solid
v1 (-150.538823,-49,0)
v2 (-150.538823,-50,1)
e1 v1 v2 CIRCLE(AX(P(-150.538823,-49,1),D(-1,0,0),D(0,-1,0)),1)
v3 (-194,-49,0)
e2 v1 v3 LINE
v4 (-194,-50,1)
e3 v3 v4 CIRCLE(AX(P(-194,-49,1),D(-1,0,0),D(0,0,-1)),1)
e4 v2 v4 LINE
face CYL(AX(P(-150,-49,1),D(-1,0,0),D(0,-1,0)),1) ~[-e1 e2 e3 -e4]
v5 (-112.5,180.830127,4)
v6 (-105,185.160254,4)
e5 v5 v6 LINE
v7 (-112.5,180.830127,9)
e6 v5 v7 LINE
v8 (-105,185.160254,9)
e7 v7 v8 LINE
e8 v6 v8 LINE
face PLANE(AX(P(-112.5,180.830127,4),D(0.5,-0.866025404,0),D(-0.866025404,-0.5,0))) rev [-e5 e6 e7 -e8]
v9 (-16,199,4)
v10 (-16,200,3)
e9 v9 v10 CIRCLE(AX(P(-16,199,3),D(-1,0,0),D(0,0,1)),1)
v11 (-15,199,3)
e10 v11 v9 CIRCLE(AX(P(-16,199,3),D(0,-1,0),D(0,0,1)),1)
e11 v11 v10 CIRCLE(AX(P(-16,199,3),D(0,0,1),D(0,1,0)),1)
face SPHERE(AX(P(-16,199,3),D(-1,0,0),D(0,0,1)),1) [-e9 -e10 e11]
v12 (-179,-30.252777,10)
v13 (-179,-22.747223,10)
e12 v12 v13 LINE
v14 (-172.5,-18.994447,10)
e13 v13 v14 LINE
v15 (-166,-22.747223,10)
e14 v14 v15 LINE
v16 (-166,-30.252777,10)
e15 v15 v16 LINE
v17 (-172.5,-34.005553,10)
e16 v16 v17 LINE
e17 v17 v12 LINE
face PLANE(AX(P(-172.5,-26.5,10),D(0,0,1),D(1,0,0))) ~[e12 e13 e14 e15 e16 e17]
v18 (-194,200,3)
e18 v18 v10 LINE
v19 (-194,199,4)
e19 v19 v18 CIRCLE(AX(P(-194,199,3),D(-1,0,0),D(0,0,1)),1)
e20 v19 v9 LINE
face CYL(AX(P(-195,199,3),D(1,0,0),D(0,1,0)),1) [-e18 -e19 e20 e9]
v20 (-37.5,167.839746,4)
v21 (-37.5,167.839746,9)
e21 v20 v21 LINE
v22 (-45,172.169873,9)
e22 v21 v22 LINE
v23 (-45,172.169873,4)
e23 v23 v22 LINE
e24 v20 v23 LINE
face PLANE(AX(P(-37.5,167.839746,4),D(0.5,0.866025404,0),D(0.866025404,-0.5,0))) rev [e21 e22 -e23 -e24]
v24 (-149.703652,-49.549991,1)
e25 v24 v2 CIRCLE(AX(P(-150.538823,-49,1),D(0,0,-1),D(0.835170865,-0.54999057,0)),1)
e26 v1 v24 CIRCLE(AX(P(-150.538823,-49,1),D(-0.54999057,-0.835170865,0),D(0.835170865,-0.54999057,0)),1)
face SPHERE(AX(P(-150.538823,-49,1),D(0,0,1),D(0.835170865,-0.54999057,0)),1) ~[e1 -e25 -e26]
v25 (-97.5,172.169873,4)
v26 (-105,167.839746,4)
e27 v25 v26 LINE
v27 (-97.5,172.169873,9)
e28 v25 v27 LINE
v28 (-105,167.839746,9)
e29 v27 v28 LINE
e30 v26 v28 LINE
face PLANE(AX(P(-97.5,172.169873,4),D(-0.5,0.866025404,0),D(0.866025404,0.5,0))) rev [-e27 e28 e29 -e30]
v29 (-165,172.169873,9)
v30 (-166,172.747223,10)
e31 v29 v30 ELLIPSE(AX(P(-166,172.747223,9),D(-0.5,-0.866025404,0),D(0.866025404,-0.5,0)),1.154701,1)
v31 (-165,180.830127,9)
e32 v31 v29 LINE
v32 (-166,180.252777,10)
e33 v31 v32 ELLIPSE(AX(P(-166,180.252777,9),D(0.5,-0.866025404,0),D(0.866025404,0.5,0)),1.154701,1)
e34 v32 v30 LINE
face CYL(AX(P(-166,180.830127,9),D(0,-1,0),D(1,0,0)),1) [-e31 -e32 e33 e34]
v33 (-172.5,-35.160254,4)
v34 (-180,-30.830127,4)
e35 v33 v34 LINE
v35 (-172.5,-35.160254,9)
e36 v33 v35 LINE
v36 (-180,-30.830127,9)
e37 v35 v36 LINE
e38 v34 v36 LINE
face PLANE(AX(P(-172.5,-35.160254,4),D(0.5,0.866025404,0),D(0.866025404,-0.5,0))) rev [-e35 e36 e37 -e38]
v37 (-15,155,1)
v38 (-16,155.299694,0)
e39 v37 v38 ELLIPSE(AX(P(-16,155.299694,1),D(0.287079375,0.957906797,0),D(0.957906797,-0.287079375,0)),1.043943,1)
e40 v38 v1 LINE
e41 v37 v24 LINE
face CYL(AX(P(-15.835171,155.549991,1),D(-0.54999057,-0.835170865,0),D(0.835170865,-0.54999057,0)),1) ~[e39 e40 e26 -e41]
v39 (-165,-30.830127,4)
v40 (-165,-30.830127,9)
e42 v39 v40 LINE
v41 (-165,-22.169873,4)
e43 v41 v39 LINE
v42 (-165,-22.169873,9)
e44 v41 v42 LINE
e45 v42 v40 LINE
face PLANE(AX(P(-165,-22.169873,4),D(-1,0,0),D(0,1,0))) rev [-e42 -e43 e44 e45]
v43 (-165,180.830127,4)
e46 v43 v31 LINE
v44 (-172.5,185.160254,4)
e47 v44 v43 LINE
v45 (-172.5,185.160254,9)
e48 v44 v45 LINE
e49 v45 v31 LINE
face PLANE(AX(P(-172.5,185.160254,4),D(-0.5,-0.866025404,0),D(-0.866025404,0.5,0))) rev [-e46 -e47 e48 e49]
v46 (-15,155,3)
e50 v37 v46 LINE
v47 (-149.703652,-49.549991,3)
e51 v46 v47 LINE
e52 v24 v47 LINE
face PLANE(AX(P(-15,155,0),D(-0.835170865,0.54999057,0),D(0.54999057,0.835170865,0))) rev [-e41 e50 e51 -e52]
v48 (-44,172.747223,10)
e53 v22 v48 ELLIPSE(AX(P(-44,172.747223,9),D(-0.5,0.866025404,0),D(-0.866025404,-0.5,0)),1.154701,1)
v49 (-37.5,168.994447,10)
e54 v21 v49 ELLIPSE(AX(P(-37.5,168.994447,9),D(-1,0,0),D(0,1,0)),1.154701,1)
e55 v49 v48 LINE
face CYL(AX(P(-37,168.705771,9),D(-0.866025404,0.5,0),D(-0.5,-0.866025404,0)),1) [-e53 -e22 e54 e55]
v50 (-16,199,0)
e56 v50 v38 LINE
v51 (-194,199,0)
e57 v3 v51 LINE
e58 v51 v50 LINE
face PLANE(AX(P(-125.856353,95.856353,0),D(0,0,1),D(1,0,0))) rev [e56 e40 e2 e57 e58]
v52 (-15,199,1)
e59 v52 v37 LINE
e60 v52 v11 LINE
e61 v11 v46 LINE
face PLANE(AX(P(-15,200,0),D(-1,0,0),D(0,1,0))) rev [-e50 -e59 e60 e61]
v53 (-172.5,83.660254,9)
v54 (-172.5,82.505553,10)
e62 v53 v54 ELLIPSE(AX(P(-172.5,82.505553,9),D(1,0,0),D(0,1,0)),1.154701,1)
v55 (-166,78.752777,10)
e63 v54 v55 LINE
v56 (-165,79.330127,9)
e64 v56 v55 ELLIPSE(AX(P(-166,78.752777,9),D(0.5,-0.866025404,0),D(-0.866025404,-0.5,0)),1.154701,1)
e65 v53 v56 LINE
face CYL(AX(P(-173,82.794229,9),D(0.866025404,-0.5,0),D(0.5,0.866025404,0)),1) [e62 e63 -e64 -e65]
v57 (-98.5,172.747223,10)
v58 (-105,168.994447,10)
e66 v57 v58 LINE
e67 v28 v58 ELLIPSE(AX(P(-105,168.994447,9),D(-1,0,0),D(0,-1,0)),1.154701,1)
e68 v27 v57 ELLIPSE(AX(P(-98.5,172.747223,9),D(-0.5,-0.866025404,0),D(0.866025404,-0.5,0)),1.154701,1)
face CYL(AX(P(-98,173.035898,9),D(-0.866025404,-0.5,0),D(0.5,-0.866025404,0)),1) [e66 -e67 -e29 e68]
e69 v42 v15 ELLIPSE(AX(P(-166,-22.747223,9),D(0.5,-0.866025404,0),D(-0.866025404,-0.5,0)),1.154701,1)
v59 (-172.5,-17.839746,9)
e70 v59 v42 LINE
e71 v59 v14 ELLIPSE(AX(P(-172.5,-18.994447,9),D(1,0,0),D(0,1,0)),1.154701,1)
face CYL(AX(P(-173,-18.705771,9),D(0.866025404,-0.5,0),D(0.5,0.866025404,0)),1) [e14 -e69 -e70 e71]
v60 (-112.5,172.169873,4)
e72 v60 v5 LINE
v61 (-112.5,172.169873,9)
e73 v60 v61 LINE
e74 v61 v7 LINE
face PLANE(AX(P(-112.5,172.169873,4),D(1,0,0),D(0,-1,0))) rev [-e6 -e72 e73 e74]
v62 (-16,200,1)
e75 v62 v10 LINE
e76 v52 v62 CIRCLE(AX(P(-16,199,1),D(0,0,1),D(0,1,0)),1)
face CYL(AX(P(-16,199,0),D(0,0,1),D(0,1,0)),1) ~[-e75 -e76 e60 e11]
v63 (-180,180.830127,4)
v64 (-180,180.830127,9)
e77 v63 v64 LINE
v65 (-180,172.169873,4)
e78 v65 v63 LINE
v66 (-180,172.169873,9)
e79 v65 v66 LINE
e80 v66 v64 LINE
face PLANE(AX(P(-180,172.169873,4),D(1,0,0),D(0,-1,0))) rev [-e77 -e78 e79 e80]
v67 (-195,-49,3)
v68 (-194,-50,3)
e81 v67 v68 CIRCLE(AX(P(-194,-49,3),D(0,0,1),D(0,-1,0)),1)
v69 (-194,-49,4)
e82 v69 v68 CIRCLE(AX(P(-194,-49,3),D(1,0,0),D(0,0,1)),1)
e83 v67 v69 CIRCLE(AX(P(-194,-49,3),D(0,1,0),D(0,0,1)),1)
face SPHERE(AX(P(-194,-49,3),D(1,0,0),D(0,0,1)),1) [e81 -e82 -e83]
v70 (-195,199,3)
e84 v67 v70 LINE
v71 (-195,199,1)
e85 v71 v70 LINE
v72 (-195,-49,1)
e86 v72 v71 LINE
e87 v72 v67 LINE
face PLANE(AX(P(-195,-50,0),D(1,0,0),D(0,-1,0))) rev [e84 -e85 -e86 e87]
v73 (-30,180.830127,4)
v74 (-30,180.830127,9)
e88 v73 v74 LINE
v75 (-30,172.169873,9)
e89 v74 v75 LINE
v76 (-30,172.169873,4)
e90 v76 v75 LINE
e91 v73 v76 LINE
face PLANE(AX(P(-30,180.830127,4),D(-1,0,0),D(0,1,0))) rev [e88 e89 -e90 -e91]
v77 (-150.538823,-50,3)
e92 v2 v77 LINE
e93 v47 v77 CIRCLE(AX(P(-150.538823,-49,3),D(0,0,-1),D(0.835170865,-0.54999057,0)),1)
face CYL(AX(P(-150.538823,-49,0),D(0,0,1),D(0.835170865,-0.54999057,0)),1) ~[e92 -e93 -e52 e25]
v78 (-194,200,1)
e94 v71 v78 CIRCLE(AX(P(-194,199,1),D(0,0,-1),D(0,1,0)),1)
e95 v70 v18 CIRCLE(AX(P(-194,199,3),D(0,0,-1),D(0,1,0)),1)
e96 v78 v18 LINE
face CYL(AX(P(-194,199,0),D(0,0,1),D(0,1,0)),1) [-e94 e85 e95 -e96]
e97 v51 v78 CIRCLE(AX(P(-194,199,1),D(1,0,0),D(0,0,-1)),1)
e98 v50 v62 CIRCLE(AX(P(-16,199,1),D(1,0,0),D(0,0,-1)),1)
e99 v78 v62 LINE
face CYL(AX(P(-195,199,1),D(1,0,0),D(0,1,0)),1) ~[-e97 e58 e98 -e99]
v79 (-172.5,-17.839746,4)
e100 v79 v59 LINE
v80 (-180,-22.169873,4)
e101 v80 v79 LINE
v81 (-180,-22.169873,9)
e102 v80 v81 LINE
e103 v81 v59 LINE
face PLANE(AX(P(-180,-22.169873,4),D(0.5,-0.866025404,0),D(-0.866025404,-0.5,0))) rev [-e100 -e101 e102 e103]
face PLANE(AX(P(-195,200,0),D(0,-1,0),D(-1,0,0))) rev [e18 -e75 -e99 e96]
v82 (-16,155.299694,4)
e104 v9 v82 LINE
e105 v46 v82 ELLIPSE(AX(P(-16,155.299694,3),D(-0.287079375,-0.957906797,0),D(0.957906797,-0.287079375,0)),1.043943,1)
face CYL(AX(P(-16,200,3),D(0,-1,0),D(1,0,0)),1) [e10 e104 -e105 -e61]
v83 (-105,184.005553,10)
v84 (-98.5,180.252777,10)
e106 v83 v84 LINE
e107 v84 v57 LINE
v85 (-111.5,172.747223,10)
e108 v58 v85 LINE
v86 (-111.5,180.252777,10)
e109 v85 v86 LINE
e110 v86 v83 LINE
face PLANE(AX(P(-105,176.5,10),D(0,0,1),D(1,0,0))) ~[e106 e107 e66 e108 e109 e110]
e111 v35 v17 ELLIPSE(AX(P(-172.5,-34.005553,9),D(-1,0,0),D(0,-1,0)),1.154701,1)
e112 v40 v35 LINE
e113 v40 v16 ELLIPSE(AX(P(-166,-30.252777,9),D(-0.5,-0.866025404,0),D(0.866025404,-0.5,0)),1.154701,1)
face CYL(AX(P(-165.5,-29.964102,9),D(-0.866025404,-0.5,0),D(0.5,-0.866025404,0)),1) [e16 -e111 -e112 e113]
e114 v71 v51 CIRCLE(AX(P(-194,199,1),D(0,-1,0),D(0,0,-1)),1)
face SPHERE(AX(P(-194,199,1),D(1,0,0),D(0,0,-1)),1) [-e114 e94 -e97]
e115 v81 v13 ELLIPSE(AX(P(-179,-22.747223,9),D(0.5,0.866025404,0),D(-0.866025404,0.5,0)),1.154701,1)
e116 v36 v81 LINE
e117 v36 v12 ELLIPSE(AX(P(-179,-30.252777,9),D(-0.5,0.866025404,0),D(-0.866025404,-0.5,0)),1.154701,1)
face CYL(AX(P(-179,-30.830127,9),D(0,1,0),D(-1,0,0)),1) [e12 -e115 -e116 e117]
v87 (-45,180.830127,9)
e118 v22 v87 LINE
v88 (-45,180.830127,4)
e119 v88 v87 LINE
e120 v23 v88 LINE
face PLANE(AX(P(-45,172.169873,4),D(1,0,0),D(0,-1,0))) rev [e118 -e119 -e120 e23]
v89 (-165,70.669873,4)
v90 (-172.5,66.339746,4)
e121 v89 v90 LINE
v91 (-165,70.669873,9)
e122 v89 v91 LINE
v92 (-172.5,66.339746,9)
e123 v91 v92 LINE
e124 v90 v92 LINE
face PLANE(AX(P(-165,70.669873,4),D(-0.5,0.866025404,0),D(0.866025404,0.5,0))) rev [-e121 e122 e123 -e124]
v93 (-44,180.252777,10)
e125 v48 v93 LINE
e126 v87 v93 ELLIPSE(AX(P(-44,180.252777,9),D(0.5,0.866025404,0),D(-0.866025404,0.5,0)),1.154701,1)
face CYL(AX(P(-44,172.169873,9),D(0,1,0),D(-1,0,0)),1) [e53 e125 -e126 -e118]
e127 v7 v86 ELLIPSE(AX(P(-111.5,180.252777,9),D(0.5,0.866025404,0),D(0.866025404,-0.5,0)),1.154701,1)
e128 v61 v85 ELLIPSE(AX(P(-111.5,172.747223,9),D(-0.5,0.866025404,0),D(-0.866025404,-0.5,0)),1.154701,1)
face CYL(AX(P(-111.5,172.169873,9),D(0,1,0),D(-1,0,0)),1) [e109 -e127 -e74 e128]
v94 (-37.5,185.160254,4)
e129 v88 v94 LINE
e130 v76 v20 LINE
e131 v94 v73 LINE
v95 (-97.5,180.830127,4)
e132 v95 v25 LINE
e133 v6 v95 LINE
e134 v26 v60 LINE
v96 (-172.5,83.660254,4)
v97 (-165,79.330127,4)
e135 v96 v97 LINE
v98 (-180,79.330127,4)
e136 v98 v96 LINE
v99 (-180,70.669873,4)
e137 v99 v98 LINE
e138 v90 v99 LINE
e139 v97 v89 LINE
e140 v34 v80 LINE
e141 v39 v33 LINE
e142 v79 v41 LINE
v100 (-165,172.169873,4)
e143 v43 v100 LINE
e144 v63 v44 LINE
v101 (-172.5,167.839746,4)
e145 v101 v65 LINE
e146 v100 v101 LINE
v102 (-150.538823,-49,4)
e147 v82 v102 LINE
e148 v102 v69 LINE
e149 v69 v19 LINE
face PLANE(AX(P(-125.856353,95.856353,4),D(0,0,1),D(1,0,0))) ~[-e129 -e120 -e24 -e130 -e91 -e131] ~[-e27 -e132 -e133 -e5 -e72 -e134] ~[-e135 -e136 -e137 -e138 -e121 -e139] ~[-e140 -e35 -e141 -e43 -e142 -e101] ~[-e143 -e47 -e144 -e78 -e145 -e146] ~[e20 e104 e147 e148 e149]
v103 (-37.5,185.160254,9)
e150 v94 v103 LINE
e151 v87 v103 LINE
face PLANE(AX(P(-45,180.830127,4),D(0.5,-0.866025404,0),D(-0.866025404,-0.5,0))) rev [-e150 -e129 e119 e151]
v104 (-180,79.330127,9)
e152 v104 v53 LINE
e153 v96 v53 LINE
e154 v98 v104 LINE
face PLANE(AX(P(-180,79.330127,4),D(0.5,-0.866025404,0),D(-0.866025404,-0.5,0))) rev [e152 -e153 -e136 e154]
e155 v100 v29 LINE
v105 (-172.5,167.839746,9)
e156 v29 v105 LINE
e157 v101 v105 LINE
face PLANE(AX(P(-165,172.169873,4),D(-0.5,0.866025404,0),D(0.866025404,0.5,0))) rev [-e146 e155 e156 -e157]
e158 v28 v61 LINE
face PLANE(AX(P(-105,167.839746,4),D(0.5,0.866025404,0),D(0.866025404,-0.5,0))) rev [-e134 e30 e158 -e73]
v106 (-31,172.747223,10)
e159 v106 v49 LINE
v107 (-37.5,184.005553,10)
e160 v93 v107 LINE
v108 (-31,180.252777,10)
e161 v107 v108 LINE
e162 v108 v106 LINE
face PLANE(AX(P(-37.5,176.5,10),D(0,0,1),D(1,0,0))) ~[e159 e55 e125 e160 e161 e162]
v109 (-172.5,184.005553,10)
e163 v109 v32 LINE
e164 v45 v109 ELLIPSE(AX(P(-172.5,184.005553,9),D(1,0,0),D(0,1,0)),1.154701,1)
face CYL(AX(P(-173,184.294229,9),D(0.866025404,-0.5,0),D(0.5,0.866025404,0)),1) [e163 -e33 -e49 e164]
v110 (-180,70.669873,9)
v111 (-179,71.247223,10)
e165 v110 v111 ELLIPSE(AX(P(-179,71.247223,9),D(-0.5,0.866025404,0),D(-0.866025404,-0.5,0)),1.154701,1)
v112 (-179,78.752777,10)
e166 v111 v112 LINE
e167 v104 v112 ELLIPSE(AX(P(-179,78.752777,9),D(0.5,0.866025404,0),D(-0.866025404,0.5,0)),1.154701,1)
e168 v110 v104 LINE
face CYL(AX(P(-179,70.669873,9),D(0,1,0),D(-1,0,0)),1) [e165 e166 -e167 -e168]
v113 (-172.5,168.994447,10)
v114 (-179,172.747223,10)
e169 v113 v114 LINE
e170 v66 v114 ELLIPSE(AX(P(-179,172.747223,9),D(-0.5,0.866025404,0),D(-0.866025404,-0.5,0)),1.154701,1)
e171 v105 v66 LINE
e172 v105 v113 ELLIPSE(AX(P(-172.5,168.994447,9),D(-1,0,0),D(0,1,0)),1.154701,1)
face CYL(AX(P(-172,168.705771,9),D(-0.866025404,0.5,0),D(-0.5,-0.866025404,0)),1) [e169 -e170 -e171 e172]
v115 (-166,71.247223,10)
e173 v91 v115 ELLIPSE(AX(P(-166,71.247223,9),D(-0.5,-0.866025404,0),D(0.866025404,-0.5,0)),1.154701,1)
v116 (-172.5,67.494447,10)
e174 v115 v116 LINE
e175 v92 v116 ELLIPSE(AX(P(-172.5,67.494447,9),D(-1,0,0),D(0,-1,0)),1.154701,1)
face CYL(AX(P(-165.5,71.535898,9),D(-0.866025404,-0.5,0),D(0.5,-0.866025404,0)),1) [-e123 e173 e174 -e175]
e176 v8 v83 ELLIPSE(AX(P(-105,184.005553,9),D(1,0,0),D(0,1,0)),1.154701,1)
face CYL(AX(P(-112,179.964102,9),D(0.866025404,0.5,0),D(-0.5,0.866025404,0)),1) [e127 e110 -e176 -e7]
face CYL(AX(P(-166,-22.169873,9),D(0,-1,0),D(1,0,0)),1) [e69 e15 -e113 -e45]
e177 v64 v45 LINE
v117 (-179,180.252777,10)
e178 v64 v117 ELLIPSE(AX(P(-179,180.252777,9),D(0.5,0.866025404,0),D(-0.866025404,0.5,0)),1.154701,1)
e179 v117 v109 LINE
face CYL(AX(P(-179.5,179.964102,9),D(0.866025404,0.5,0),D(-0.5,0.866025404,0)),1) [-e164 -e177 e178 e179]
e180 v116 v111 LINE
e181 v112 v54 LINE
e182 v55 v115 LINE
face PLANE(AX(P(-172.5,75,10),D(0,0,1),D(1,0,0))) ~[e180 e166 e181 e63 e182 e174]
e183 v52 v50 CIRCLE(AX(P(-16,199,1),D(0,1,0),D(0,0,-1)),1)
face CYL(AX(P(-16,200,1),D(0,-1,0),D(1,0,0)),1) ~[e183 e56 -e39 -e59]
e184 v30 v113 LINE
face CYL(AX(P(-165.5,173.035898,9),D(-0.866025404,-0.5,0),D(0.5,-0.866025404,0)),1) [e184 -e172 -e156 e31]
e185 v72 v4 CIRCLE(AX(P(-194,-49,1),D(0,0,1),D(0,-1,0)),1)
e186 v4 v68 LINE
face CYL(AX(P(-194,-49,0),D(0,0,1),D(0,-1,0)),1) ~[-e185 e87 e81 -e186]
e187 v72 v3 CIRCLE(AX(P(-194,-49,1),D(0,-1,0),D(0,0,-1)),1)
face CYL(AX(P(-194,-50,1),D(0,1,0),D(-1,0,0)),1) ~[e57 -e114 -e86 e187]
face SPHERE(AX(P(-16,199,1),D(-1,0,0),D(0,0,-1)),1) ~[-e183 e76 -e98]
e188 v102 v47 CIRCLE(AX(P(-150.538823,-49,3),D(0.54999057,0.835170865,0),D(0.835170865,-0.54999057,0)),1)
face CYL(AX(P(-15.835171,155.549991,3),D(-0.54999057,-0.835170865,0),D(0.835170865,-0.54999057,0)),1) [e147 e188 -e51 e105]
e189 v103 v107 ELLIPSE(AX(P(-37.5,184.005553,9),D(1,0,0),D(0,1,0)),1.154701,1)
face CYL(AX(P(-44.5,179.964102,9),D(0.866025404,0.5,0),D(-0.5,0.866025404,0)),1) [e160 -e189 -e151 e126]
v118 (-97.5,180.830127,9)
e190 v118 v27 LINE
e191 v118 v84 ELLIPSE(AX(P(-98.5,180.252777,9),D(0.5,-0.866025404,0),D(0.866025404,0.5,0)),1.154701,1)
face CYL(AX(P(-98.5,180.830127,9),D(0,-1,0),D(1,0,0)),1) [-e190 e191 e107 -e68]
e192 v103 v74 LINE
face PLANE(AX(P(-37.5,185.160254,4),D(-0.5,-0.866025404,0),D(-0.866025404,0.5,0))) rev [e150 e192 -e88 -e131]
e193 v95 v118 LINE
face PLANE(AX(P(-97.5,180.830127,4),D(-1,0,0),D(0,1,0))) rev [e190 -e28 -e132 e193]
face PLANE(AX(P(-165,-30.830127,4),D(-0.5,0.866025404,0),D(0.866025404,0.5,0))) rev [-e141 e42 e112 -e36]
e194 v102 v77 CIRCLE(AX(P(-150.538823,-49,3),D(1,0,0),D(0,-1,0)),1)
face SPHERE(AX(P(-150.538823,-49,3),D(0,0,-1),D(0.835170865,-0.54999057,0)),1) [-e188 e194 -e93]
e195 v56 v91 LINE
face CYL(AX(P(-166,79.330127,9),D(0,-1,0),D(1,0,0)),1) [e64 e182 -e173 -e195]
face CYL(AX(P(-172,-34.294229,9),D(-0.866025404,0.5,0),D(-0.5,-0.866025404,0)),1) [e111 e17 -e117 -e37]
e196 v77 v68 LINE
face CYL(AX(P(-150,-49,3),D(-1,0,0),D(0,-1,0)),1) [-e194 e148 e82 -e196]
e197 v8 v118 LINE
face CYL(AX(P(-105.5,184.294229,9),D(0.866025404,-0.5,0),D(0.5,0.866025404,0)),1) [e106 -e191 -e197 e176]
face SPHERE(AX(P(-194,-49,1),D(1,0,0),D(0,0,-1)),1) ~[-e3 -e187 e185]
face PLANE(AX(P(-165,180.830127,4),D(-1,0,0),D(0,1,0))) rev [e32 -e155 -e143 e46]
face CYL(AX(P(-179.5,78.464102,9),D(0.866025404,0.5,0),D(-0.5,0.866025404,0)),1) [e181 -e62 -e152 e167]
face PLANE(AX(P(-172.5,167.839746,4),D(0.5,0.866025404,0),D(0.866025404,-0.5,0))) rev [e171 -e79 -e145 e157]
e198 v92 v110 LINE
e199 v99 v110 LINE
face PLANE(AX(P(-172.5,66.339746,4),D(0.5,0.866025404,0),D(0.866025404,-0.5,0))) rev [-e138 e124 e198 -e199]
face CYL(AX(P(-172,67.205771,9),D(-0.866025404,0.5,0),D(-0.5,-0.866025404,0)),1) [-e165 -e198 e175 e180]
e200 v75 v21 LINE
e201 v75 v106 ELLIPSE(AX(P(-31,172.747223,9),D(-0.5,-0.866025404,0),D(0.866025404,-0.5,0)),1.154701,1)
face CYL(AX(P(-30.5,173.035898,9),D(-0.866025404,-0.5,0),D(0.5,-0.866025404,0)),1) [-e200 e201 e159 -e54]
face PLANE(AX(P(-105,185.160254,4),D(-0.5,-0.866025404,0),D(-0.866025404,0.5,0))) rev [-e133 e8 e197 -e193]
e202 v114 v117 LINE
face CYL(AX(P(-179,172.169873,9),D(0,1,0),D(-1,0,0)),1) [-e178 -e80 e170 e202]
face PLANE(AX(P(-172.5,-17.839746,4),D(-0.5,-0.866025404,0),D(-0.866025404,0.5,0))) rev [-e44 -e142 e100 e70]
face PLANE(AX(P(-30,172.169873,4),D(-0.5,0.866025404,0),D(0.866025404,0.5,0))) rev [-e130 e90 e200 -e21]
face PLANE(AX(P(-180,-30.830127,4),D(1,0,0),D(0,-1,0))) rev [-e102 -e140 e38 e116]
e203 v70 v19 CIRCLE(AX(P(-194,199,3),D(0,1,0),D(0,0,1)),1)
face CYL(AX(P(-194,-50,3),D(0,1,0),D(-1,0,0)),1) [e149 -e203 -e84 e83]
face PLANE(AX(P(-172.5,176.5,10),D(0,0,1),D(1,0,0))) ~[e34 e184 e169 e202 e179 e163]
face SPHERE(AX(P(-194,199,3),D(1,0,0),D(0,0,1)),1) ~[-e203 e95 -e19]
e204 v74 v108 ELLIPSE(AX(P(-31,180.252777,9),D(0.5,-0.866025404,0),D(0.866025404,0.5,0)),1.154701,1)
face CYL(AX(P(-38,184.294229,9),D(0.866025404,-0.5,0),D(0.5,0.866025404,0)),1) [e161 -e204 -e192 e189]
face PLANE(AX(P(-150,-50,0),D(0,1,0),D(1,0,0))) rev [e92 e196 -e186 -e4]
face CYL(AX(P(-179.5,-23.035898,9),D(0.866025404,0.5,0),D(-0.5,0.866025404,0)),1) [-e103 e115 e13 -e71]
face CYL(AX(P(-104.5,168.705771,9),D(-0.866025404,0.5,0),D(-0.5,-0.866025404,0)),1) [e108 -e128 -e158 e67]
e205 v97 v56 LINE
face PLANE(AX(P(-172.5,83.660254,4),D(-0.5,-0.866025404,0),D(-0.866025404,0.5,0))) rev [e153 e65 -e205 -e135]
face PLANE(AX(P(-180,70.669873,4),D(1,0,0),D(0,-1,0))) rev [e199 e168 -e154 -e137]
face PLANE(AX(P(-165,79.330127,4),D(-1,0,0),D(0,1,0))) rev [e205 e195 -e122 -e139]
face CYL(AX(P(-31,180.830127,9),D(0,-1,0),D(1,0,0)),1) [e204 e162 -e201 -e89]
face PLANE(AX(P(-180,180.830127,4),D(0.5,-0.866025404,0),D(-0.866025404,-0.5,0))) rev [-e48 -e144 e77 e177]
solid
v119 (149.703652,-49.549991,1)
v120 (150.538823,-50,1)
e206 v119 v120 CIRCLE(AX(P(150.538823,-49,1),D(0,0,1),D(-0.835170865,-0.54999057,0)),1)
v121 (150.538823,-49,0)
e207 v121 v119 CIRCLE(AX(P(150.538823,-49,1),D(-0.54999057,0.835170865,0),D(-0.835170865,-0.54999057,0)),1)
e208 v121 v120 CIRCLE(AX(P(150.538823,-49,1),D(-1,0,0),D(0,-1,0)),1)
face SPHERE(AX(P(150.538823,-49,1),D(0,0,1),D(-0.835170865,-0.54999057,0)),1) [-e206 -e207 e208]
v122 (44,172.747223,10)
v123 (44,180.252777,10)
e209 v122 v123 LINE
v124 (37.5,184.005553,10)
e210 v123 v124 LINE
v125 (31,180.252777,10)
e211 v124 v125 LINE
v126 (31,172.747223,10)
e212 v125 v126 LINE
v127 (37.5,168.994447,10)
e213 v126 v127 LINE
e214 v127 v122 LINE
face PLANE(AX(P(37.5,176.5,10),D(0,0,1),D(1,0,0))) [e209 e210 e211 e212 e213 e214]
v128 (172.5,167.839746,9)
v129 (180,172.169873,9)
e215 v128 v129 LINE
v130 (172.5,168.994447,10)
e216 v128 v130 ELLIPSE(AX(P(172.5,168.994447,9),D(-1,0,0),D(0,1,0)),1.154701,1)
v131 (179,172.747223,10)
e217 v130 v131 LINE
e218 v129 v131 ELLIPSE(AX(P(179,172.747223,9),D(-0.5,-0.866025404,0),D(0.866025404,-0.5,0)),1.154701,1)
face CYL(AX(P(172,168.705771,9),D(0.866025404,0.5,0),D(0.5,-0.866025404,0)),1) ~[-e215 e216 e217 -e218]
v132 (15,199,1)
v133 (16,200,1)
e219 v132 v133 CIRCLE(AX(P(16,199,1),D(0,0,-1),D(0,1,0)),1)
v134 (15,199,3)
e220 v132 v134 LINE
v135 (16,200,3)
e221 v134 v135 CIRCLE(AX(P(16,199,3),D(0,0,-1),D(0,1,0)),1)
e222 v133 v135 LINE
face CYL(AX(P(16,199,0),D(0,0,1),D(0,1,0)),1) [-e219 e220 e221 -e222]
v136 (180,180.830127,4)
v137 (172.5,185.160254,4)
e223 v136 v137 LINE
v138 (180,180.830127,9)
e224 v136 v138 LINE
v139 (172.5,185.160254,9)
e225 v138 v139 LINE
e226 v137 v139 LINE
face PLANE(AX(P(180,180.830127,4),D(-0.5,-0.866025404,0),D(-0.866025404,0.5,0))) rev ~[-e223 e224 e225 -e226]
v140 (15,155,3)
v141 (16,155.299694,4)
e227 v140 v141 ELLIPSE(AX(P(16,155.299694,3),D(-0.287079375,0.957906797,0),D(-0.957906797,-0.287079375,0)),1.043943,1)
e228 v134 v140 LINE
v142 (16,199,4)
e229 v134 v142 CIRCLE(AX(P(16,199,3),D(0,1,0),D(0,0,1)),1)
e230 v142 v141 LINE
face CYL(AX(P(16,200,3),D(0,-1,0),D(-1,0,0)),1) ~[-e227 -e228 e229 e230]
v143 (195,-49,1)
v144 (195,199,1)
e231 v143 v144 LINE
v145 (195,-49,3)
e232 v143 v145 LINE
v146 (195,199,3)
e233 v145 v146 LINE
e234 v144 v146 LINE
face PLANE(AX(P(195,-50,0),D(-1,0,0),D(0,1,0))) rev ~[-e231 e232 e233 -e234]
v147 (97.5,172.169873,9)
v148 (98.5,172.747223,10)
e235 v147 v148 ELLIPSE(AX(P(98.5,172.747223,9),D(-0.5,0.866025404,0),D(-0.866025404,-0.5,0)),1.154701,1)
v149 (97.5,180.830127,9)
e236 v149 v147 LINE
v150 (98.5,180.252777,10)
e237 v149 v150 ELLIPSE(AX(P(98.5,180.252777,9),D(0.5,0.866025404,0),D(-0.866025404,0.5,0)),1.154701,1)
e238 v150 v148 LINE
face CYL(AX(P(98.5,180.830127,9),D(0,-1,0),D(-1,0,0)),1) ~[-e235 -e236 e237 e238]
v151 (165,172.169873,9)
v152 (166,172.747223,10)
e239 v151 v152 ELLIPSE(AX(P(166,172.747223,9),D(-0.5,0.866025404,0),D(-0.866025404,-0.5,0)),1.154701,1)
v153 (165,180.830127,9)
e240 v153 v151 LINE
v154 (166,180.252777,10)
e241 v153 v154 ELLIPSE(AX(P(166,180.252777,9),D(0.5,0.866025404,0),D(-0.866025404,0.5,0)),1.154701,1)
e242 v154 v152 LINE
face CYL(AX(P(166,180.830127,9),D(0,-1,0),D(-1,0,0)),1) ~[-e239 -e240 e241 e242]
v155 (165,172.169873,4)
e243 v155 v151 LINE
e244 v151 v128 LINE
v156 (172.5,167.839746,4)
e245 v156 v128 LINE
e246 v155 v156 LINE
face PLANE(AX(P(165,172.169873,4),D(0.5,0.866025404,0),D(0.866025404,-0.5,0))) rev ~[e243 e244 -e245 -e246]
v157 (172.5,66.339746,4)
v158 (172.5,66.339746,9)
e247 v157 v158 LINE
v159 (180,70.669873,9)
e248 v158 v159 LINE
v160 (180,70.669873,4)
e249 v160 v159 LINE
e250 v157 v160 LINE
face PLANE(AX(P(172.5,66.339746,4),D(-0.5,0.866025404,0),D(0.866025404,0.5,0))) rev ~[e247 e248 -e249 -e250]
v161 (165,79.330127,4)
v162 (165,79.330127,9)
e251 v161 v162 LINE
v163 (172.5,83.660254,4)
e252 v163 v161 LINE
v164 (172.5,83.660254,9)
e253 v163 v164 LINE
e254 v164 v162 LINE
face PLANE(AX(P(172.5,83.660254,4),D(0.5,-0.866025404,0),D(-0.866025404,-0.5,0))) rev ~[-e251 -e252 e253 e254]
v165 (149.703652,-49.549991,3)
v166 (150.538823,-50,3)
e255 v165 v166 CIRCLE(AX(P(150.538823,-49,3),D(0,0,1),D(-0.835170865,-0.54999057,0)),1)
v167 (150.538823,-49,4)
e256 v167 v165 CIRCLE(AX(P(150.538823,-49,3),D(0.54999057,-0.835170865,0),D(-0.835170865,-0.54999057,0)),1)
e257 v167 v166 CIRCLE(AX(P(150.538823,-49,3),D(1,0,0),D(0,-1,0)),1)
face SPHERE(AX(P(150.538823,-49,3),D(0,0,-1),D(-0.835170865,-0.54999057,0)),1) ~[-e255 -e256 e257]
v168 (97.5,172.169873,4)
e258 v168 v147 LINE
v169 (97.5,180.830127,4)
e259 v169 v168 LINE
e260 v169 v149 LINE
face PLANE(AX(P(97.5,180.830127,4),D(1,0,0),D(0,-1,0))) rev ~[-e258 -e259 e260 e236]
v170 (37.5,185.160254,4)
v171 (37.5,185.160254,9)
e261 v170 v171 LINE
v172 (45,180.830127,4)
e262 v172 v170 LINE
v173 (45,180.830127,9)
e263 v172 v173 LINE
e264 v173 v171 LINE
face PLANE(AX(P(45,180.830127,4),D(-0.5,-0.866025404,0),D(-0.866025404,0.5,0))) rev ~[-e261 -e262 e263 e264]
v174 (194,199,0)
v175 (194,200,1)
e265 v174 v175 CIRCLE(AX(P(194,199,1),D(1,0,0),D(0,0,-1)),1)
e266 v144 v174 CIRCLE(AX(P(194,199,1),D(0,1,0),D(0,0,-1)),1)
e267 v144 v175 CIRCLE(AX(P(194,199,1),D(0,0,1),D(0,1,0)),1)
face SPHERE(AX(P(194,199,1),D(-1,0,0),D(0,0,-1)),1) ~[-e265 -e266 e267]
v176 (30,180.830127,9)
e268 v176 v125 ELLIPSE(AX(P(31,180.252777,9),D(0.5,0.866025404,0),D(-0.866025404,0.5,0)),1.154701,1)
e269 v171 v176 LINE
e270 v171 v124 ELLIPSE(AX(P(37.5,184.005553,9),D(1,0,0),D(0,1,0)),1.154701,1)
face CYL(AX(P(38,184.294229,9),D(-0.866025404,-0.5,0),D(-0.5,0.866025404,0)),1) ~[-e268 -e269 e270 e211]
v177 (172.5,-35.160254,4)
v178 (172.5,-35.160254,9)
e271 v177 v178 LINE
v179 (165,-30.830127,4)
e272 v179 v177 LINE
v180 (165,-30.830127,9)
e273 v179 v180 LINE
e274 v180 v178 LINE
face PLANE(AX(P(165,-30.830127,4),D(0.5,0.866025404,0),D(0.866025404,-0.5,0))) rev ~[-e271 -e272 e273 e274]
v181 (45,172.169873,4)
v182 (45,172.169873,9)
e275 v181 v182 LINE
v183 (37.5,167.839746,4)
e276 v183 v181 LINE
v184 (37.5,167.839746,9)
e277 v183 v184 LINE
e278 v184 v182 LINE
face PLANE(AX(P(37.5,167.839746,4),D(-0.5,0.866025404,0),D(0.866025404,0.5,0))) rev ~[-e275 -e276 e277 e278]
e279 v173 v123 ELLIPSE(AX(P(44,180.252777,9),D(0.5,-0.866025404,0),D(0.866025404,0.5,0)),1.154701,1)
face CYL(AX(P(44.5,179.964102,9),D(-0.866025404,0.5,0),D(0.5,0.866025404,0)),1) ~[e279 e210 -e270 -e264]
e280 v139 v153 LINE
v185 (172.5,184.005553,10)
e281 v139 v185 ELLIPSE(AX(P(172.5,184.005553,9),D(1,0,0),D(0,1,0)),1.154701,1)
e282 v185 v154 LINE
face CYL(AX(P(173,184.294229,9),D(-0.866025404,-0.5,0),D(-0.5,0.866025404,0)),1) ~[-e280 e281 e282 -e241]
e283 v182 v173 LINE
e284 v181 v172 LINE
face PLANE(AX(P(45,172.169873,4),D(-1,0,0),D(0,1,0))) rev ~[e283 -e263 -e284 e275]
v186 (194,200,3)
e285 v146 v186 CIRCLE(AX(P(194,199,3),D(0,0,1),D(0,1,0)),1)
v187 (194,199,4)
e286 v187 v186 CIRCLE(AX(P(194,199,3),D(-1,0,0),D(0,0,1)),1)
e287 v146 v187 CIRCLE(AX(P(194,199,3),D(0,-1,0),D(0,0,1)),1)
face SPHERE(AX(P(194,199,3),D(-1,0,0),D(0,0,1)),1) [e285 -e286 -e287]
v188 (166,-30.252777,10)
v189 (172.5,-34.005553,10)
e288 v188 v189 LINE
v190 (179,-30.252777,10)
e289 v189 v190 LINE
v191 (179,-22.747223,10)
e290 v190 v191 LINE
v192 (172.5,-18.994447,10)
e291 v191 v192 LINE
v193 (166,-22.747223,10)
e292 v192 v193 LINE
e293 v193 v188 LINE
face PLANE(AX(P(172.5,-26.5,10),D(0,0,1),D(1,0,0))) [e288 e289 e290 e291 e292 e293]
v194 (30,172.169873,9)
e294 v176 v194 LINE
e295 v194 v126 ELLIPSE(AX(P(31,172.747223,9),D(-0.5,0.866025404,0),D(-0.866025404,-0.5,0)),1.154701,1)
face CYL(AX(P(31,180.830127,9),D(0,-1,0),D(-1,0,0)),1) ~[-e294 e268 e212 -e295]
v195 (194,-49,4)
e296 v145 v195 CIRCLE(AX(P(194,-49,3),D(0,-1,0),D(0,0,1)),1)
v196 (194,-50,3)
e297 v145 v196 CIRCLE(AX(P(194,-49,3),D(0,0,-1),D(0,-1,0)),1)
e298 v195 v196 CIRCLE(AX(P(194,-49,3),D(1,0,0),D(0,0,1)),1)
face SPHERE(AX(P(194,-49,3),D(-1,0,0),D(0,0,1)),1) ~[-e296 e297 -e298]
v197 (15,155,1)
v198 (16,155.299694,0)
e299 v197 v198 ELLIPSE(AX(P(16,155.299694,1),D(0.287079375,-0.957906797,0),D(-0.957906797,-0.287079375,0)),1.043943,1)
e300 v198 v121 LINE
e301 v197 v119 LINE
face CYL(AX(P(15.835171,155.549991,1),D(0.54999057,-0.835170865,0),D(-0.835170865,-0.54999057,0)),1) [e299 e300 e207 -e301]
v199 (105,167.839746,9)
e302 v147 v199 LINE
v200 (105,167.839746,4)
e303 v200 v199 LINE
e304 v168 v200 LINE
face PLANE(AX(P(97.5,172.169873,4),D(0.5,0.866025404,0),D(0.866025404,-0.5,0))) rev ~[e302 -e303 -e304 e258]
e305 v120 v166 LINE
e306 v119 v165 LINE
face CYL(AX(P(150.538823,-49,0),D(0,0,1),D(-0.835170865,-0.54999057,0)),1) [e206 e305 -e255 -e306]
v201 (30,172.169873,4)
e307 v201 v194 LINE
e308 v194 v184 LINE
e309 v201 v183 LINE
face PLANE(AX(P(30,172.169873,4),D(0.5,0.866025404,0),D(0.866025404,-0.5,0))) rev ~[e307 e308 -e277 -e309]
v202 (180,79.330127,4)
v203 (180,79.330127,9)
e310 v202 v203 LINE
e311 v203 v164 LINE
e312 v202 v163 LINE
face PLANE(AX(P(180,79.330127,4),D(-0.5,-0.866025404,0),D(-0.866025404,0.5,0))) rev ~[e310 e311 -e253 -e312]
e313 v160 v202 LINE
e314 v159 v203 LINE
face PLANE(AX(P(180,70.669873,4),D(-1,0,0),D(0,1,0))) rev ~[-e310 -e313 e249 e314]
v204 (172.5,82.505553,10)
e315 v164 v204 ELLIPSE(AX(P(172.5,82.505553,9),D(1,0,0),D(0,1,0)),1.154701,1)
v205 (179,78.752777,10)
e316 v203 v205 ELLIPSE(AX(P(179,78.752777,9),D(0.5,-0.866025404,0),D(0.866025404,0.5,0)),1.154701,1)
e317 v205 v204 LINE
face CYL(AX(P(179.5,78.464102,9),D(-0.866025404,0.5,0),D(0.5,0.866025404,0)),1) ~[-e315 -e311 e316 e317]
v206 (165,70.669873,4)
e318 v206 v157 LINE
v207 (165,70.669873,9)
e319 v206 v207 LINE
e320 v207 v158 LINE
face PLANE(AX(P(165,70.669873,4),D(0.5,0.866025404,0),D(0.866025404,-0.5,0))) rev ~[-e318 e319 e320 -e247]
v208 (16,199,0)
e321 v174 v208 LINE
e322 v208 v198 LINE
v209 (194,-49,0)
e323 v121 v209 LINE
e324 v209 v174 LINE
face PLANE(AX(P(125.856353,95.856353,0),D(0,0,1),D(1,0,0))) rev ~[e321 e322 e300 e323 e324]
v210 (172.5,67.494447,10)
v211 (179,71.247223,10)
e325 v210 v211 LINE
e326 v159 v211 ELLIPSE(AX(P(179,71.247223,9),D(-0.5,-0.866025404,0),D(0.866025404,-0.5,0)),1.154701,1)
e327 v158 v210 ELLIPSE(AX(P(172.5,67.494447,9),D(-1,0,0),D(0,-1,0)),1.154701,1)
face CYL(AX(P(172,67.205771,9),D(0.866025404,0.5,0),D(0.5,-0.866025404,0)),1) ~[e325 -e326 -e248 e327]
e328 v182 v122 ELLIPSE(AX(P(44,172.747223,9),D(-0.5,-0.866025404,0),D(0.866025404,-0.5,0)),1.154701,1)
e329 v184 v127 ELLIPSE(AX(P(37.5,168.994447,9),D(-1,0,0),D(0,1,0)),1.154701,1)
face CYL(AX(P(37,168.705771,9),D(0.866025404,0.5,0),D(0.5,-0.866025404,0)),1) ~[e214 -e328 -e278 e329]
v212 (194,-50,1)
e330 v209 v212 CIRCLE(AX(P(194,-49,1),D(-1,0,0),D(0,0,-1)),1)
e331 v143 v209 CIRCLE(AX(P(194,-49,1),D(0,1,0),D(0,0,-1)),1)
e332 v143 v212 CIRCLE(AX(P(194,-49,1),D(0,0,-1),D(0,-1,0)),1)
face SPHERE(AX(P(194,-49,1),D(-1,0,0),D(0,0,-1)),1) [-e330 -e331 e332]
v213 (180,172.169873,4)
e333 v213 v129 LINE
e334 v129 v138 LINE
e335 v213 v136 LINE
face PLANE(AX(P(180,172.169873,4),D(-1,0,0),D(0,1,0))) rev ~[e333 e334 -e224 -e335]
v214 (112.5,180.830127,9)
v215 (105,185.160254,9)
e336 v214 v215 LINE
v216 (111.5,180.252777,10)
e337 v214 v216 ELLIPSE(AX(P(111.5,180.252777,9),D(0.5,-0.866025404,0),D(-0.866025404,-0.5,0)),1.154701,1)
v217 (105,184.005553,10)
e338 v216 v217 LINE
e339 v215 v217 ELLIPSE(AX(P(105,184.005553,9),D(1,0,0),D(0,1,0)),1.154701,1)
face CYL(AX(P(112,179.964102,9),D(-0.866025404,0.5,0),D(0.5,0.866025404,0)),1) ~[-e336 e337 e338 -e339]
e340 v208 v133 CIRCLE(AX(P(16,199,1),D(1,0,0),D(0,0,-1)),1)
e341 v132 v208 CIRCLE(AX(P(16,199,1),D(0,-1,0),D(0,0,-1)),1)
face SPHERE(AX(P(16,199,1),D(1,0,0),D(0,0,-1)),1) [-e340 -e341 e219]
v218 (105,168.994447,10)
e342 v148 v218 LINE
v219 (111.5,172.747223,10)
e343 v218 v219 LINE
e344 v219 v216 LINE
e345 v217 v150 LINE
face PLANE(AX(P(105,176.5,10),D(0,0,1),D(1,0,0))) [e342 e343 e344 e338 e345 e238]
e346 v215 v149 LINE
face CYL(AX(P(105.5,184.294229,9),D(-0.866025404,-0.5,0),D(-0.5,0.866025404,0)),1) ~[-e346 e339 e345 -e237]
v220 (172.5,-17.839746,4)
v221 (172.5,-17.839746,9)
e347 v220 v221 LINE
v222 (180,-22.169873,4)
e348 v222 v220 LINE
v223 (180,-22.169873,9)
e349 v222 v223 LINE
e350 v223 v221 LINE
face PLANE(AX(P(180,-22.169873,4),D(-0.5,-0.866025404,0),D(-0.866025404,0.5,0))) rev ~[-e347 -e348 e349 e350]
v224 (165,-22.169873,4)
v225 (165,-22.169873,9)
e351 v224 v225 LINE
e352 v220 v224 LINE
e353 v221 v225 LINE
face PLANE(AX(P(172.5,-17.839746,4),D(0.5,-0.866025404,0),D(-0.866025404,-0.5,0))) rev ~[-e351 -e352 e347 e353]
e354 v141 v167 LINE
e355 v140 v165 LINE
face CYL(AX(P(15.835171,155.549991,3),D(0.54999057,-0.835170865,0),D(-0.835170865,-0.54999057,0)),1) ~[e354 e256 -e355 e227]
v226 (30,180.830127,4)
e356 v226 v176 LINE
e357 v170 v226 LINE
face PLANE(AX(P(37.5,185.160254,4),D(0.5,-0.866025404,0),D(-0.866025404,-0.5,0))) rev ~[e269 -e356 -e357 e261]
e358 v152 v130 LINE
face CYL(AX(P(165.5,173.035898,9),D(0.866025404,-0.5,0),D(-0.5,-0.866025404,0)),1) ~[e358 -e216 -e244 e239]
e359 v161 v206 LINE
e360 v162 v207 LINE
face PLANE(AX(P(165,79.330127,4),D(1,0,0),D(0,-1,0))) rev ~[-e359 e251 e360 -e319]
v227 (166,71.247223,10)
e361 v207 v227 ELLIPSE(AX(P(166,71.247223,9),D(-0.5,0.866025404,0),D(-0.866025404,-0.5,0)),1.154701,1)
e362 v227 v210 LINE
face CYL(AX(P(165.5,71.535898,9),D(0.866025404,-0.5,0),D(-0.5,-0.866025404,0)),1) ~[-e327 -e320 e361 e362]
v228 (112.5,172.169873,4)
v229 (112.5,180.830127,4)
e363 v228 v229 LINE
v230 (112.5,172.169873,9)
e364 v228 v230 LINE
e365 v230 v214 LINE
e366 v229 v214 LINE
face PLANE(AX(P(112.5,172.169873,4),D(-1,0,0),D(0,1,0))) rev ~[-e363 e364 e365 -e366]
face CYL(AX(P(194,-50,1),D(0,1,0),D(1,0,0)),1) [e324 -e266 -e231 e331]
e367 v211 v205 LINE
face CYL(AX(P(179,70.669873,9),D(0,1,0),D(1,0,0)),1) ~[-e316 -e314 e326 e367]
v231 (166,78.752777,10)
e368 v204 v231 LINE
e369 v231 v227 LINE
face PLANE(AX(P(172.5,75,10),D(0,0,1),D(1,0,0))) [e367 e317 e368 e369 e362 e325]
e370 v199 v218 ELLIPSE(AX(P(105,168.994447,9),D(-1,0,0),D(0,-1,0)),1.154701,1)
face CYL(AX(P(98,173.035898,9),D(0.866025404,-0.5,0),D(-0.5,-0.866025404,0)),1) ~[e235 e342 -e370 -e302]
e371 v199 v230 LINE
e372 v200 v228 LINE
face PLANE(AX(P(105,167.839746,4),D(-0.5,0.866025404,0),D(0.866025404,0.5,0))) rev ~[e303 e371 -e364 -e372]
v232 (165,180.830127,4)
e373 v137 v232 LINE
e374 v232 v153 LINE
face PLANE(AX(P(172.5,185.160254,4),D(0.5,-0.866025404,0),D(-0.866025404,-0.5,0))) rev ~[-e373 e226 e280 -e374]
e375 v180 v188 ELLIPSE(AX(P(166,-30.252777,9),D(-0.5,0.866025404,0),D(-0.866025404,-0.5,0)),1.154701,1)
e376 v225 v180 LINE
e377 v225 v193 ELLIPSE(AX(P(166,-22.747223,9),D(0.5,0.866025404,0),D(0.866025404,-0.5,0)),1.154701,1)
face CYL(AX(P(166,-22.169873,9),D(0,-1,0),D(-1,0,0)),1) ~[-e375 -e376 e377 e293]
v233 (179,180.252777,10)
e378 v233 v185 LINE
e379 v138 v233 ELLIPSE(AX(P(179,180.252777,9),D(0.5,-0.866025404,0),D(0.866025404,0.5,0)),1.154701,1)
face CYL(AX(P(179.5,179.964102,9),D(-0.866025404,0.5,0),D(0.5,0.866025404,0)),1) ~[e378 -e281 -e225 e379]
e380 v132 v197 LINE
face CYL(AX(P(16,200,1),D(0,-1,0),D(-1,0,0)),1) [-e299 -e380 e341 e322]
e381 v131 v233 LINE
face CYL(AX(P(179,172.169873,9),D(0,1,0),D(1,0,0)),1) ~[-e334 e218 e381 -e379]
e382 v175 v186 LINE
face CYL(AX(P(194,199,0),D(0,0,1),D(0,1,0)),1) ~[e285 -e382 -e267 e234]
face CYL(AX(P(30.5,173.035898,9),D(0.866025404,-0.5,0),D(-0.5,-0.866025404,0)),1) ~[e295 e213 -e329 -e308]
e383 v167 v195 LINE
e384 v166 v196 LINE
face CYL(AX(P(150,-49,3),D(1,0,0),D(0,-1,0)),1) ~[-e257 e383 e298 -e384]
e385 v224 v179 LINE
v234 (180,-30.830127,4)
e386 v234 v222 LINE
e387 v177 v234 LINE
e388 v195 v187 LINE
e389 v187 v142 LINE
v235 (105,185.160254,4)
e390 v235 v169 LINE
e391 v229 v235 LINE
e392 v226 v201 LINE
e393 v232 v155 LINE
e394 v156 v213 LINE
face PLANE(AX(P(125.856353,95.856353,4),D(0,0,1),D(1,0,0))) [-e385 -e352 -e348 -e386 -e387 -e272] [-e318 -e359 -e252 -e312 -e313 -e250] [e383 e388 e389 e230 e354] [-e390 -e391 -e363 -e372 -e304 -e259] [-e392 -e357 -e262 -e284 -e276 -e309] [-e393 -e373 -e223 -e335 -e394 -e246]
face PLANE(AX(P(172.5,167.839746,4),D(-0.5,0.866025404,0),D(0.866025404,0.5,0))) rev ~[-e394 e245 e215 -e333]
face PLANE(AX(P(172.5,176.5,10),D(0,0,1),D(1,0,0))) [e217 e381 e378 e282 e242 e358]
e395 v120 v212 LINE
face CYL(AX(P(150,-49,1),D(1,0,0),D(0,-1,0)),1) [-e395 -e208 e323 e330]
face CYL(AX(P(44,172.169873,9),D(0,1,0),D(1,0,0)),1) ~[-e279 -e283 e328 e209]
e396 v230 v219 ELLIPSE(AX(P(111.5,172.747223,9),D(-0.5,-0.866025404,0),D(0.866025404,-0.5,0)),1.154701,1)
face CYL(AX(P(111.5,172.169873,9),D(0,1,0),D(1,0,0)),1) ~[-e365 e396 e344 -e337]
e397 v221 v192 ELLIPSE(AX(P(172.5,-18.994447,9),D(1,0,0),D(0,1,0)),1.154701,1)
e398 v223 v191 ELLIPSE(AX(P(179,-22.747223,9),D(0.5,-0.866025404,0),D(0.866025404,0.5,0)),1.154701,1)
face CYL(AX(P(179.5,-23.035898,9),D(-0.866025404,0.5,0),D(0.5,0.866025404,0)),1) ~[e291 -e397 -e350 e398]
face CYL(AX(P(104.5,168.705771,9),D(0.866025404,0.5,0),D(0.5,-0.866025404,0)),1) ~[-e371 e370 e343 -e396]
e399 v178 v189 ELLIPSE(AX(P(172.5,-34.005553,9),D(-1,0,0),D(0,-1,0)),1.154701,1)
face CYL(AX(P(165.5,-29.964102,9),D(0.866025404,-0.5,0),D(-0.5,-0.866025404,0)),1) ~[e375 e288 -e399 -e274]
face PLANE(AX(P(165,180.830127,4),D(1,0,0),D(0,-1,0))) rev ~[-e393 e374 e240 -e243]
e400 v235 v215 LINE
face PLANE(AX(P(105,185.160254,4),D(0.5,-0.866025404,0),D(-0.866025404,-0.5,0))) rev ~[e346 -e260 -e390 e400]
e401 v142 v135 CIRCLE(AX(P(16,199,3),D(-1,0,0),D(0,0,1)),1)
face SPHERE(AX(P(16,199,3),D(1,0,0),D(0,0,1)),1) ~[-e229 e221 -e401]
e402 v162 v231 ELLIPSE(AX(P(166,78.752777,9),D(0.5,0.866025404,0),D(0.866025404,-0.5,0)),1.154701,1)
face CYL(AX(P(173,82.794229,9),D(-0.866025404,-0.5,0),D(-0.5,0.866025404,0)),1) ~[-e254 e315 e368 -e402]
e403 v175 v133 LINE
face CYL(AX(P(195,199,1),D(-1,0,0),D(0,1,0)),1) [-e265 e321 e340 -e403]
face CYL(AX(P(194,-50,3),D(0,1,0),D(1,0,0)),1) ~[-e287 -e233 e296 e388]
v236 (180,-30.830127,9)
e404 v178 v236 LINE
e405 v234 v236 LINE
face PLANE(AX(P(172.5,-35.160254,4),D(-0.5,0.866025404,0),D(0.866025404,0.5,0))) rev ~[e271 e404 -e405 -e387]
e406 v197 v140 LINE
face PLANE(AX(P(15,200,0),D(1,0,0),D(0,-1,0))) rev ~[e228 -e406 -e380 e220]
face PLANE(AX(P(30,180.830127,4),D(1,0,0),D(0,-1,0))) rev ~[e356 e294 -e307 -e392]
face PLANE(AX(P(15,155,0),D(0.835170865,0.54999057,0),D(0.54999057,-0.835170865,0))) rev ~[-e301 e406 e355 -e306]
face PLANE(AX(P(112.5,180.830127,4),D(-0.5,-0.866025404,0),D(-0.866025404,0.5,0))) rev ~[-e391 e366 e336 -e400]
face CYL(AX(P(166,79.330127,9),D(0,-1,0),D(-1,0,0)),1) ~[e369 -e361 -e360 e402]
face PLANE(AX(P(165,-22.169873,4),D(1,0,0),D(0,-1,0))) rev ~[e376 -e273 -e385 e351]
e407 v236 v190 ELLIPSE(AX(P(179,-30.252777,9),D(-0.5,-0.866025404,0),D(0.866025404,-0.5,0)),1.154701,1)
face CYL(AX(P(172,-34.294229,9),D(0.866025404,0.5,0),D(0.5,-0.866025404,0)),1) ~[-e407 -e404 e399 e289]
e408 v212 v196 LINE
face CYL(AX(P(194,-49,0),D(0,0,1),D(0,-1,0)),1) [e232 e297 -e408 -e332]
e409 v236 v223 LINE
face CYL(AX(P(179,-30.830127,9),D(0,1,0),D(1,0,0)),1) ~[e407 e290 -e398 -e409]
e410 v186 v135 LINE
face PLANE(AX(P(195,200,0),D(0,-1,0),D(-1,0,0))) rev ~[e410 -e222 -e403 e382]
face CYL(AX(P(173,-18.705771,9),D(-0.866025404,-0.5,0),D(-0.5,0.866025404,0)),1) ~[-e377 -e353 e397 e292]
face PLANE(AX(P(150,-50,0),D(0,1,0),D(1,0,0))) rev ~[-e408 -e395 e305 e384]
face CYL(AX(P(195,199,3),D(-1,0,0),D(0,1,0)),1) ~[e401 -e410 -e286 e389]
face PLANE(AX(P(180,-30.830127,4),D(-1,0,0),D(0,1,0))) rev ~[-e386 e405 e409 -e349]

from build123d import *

# Parameters (mm, degrees)
F1_DEPTH = 4
F2_R     = 1
F4_DEPTH = 6
F5_R     = 1


with BuildPart() as f1:
    # F0 (on Top) → F1 (new body)
    with BuildSketch(Plane.XY):
        Polygon((195, 200), (15, 200), (15, 155), (150, -50), (195, -50), align=None)
    extrude(amount=F1_DEPTH)

    # F2
    f2_edges = [f1.edges().sort_by_distance(p)[0] for p in [
        (105, 200, 4),
        (15, 177.5, 4),
        (82.5, 52.5, 4),
        (172.5, -50, 4),
        (195, 75, 4),
        (105, 200, 0),
        (15, 177.5, 0),
        (82.5, 52.5, 0),
        (172.5, -50, 0),
        (195, 75, 0),
        (195, -50, 2),
        (195, 200, 2),
        (15, 200, 2),
        (150, -50, 2),
    ]]
    fillet(f2_edges, radius=F2_R)

    # F3 (on face) → F4 (join)
    with BuildSketch(Plane.XY.offset(4)):
        Polygon((37.5, 167.8397459622), (45, 172.1698729811), (45, 180.8301270189), (37.5, 185.1602540378), (30, 180.8301270189), (30, 172.1698729811), align=None)
        Polygon((112.5, 180.8301270189), (105, 185.1602540378), (97.5, 180.8301270189), (97.5, 172.1698729811), (105, 167.8397459622), (112.5, 172.1698729811), align=None)
        Polygon((180, 180.8301270189), (172.5, 185.1602540378), (165, 180.8301270189), (165, 172.1698729811), (172.5, 167.8397459622), (180, 172.1698729811), align=None)
        Polygon((165, 79.3301270189), (165, 70.6698729811), (172.5, 66.3397459622), (180, 70.6698729811), (180, 79.3301270189), (172.5, 83.6602540378), align=None)
        Polygon((165, -22.1698729811), (165, -30.8301270189), (172.5, -35.1602540378), (180, -30.8301270189), (180, -22.1698729811), (172.5, -17.8397459622), align=None)
    extrude(amount=F4_DEPTH)

    # F5
    f5_edges = [f1.edges().sort_by_distance(p)[0] for p in [
        (165, -26.5, 10),
        (168.75, -32.995191, 10),
        (176.25, -32.995191, 10),
        (180, -26.5, 10),
        (176.25, -20.004809, 10),
        (168.75, -20.004809, 10),
        (165, 75, 10),
        (168.75, 68.504809, 10),
        (176.25, 68.504809, 10),
        (180, 75, 10),
        (176.25, 81.495191, 10),
        (168.75, 81.495191, 10),
        (176.25, 170.004809, 10),
        (180, 176.5, 10),
        (176.25, 182.995191, 10),
        (168.75, 182.995191, 10),
        (165, 176.5, 10),
        (168.75, 170.004809, 10),
        (108.75, 182.995191, 10),
        (101.25, 182.995191, 10),
        (97.5, 176.5, 10),
        (101.25, 170.004809, 10),
        (108.75, 170.004809, 10),
        (112.5, 176.5, 10),
        (41.25, 170.004809, 10),
        (45, 176.5, 10),
        (41.25, 182.995191, 10),
        (33.75, 182.995191, 10),
        (30, 176.5, 10),
        (33.75, 170.004809, 10),
    ]]
    fillet(f5_edges, radius=F5_R)


with BuildPart() as f6_1:
    # F6: instance of F1
    add(f1.part.mirror(Plane.YZ))


solid = Compound([f1.part, f6_1.part])
